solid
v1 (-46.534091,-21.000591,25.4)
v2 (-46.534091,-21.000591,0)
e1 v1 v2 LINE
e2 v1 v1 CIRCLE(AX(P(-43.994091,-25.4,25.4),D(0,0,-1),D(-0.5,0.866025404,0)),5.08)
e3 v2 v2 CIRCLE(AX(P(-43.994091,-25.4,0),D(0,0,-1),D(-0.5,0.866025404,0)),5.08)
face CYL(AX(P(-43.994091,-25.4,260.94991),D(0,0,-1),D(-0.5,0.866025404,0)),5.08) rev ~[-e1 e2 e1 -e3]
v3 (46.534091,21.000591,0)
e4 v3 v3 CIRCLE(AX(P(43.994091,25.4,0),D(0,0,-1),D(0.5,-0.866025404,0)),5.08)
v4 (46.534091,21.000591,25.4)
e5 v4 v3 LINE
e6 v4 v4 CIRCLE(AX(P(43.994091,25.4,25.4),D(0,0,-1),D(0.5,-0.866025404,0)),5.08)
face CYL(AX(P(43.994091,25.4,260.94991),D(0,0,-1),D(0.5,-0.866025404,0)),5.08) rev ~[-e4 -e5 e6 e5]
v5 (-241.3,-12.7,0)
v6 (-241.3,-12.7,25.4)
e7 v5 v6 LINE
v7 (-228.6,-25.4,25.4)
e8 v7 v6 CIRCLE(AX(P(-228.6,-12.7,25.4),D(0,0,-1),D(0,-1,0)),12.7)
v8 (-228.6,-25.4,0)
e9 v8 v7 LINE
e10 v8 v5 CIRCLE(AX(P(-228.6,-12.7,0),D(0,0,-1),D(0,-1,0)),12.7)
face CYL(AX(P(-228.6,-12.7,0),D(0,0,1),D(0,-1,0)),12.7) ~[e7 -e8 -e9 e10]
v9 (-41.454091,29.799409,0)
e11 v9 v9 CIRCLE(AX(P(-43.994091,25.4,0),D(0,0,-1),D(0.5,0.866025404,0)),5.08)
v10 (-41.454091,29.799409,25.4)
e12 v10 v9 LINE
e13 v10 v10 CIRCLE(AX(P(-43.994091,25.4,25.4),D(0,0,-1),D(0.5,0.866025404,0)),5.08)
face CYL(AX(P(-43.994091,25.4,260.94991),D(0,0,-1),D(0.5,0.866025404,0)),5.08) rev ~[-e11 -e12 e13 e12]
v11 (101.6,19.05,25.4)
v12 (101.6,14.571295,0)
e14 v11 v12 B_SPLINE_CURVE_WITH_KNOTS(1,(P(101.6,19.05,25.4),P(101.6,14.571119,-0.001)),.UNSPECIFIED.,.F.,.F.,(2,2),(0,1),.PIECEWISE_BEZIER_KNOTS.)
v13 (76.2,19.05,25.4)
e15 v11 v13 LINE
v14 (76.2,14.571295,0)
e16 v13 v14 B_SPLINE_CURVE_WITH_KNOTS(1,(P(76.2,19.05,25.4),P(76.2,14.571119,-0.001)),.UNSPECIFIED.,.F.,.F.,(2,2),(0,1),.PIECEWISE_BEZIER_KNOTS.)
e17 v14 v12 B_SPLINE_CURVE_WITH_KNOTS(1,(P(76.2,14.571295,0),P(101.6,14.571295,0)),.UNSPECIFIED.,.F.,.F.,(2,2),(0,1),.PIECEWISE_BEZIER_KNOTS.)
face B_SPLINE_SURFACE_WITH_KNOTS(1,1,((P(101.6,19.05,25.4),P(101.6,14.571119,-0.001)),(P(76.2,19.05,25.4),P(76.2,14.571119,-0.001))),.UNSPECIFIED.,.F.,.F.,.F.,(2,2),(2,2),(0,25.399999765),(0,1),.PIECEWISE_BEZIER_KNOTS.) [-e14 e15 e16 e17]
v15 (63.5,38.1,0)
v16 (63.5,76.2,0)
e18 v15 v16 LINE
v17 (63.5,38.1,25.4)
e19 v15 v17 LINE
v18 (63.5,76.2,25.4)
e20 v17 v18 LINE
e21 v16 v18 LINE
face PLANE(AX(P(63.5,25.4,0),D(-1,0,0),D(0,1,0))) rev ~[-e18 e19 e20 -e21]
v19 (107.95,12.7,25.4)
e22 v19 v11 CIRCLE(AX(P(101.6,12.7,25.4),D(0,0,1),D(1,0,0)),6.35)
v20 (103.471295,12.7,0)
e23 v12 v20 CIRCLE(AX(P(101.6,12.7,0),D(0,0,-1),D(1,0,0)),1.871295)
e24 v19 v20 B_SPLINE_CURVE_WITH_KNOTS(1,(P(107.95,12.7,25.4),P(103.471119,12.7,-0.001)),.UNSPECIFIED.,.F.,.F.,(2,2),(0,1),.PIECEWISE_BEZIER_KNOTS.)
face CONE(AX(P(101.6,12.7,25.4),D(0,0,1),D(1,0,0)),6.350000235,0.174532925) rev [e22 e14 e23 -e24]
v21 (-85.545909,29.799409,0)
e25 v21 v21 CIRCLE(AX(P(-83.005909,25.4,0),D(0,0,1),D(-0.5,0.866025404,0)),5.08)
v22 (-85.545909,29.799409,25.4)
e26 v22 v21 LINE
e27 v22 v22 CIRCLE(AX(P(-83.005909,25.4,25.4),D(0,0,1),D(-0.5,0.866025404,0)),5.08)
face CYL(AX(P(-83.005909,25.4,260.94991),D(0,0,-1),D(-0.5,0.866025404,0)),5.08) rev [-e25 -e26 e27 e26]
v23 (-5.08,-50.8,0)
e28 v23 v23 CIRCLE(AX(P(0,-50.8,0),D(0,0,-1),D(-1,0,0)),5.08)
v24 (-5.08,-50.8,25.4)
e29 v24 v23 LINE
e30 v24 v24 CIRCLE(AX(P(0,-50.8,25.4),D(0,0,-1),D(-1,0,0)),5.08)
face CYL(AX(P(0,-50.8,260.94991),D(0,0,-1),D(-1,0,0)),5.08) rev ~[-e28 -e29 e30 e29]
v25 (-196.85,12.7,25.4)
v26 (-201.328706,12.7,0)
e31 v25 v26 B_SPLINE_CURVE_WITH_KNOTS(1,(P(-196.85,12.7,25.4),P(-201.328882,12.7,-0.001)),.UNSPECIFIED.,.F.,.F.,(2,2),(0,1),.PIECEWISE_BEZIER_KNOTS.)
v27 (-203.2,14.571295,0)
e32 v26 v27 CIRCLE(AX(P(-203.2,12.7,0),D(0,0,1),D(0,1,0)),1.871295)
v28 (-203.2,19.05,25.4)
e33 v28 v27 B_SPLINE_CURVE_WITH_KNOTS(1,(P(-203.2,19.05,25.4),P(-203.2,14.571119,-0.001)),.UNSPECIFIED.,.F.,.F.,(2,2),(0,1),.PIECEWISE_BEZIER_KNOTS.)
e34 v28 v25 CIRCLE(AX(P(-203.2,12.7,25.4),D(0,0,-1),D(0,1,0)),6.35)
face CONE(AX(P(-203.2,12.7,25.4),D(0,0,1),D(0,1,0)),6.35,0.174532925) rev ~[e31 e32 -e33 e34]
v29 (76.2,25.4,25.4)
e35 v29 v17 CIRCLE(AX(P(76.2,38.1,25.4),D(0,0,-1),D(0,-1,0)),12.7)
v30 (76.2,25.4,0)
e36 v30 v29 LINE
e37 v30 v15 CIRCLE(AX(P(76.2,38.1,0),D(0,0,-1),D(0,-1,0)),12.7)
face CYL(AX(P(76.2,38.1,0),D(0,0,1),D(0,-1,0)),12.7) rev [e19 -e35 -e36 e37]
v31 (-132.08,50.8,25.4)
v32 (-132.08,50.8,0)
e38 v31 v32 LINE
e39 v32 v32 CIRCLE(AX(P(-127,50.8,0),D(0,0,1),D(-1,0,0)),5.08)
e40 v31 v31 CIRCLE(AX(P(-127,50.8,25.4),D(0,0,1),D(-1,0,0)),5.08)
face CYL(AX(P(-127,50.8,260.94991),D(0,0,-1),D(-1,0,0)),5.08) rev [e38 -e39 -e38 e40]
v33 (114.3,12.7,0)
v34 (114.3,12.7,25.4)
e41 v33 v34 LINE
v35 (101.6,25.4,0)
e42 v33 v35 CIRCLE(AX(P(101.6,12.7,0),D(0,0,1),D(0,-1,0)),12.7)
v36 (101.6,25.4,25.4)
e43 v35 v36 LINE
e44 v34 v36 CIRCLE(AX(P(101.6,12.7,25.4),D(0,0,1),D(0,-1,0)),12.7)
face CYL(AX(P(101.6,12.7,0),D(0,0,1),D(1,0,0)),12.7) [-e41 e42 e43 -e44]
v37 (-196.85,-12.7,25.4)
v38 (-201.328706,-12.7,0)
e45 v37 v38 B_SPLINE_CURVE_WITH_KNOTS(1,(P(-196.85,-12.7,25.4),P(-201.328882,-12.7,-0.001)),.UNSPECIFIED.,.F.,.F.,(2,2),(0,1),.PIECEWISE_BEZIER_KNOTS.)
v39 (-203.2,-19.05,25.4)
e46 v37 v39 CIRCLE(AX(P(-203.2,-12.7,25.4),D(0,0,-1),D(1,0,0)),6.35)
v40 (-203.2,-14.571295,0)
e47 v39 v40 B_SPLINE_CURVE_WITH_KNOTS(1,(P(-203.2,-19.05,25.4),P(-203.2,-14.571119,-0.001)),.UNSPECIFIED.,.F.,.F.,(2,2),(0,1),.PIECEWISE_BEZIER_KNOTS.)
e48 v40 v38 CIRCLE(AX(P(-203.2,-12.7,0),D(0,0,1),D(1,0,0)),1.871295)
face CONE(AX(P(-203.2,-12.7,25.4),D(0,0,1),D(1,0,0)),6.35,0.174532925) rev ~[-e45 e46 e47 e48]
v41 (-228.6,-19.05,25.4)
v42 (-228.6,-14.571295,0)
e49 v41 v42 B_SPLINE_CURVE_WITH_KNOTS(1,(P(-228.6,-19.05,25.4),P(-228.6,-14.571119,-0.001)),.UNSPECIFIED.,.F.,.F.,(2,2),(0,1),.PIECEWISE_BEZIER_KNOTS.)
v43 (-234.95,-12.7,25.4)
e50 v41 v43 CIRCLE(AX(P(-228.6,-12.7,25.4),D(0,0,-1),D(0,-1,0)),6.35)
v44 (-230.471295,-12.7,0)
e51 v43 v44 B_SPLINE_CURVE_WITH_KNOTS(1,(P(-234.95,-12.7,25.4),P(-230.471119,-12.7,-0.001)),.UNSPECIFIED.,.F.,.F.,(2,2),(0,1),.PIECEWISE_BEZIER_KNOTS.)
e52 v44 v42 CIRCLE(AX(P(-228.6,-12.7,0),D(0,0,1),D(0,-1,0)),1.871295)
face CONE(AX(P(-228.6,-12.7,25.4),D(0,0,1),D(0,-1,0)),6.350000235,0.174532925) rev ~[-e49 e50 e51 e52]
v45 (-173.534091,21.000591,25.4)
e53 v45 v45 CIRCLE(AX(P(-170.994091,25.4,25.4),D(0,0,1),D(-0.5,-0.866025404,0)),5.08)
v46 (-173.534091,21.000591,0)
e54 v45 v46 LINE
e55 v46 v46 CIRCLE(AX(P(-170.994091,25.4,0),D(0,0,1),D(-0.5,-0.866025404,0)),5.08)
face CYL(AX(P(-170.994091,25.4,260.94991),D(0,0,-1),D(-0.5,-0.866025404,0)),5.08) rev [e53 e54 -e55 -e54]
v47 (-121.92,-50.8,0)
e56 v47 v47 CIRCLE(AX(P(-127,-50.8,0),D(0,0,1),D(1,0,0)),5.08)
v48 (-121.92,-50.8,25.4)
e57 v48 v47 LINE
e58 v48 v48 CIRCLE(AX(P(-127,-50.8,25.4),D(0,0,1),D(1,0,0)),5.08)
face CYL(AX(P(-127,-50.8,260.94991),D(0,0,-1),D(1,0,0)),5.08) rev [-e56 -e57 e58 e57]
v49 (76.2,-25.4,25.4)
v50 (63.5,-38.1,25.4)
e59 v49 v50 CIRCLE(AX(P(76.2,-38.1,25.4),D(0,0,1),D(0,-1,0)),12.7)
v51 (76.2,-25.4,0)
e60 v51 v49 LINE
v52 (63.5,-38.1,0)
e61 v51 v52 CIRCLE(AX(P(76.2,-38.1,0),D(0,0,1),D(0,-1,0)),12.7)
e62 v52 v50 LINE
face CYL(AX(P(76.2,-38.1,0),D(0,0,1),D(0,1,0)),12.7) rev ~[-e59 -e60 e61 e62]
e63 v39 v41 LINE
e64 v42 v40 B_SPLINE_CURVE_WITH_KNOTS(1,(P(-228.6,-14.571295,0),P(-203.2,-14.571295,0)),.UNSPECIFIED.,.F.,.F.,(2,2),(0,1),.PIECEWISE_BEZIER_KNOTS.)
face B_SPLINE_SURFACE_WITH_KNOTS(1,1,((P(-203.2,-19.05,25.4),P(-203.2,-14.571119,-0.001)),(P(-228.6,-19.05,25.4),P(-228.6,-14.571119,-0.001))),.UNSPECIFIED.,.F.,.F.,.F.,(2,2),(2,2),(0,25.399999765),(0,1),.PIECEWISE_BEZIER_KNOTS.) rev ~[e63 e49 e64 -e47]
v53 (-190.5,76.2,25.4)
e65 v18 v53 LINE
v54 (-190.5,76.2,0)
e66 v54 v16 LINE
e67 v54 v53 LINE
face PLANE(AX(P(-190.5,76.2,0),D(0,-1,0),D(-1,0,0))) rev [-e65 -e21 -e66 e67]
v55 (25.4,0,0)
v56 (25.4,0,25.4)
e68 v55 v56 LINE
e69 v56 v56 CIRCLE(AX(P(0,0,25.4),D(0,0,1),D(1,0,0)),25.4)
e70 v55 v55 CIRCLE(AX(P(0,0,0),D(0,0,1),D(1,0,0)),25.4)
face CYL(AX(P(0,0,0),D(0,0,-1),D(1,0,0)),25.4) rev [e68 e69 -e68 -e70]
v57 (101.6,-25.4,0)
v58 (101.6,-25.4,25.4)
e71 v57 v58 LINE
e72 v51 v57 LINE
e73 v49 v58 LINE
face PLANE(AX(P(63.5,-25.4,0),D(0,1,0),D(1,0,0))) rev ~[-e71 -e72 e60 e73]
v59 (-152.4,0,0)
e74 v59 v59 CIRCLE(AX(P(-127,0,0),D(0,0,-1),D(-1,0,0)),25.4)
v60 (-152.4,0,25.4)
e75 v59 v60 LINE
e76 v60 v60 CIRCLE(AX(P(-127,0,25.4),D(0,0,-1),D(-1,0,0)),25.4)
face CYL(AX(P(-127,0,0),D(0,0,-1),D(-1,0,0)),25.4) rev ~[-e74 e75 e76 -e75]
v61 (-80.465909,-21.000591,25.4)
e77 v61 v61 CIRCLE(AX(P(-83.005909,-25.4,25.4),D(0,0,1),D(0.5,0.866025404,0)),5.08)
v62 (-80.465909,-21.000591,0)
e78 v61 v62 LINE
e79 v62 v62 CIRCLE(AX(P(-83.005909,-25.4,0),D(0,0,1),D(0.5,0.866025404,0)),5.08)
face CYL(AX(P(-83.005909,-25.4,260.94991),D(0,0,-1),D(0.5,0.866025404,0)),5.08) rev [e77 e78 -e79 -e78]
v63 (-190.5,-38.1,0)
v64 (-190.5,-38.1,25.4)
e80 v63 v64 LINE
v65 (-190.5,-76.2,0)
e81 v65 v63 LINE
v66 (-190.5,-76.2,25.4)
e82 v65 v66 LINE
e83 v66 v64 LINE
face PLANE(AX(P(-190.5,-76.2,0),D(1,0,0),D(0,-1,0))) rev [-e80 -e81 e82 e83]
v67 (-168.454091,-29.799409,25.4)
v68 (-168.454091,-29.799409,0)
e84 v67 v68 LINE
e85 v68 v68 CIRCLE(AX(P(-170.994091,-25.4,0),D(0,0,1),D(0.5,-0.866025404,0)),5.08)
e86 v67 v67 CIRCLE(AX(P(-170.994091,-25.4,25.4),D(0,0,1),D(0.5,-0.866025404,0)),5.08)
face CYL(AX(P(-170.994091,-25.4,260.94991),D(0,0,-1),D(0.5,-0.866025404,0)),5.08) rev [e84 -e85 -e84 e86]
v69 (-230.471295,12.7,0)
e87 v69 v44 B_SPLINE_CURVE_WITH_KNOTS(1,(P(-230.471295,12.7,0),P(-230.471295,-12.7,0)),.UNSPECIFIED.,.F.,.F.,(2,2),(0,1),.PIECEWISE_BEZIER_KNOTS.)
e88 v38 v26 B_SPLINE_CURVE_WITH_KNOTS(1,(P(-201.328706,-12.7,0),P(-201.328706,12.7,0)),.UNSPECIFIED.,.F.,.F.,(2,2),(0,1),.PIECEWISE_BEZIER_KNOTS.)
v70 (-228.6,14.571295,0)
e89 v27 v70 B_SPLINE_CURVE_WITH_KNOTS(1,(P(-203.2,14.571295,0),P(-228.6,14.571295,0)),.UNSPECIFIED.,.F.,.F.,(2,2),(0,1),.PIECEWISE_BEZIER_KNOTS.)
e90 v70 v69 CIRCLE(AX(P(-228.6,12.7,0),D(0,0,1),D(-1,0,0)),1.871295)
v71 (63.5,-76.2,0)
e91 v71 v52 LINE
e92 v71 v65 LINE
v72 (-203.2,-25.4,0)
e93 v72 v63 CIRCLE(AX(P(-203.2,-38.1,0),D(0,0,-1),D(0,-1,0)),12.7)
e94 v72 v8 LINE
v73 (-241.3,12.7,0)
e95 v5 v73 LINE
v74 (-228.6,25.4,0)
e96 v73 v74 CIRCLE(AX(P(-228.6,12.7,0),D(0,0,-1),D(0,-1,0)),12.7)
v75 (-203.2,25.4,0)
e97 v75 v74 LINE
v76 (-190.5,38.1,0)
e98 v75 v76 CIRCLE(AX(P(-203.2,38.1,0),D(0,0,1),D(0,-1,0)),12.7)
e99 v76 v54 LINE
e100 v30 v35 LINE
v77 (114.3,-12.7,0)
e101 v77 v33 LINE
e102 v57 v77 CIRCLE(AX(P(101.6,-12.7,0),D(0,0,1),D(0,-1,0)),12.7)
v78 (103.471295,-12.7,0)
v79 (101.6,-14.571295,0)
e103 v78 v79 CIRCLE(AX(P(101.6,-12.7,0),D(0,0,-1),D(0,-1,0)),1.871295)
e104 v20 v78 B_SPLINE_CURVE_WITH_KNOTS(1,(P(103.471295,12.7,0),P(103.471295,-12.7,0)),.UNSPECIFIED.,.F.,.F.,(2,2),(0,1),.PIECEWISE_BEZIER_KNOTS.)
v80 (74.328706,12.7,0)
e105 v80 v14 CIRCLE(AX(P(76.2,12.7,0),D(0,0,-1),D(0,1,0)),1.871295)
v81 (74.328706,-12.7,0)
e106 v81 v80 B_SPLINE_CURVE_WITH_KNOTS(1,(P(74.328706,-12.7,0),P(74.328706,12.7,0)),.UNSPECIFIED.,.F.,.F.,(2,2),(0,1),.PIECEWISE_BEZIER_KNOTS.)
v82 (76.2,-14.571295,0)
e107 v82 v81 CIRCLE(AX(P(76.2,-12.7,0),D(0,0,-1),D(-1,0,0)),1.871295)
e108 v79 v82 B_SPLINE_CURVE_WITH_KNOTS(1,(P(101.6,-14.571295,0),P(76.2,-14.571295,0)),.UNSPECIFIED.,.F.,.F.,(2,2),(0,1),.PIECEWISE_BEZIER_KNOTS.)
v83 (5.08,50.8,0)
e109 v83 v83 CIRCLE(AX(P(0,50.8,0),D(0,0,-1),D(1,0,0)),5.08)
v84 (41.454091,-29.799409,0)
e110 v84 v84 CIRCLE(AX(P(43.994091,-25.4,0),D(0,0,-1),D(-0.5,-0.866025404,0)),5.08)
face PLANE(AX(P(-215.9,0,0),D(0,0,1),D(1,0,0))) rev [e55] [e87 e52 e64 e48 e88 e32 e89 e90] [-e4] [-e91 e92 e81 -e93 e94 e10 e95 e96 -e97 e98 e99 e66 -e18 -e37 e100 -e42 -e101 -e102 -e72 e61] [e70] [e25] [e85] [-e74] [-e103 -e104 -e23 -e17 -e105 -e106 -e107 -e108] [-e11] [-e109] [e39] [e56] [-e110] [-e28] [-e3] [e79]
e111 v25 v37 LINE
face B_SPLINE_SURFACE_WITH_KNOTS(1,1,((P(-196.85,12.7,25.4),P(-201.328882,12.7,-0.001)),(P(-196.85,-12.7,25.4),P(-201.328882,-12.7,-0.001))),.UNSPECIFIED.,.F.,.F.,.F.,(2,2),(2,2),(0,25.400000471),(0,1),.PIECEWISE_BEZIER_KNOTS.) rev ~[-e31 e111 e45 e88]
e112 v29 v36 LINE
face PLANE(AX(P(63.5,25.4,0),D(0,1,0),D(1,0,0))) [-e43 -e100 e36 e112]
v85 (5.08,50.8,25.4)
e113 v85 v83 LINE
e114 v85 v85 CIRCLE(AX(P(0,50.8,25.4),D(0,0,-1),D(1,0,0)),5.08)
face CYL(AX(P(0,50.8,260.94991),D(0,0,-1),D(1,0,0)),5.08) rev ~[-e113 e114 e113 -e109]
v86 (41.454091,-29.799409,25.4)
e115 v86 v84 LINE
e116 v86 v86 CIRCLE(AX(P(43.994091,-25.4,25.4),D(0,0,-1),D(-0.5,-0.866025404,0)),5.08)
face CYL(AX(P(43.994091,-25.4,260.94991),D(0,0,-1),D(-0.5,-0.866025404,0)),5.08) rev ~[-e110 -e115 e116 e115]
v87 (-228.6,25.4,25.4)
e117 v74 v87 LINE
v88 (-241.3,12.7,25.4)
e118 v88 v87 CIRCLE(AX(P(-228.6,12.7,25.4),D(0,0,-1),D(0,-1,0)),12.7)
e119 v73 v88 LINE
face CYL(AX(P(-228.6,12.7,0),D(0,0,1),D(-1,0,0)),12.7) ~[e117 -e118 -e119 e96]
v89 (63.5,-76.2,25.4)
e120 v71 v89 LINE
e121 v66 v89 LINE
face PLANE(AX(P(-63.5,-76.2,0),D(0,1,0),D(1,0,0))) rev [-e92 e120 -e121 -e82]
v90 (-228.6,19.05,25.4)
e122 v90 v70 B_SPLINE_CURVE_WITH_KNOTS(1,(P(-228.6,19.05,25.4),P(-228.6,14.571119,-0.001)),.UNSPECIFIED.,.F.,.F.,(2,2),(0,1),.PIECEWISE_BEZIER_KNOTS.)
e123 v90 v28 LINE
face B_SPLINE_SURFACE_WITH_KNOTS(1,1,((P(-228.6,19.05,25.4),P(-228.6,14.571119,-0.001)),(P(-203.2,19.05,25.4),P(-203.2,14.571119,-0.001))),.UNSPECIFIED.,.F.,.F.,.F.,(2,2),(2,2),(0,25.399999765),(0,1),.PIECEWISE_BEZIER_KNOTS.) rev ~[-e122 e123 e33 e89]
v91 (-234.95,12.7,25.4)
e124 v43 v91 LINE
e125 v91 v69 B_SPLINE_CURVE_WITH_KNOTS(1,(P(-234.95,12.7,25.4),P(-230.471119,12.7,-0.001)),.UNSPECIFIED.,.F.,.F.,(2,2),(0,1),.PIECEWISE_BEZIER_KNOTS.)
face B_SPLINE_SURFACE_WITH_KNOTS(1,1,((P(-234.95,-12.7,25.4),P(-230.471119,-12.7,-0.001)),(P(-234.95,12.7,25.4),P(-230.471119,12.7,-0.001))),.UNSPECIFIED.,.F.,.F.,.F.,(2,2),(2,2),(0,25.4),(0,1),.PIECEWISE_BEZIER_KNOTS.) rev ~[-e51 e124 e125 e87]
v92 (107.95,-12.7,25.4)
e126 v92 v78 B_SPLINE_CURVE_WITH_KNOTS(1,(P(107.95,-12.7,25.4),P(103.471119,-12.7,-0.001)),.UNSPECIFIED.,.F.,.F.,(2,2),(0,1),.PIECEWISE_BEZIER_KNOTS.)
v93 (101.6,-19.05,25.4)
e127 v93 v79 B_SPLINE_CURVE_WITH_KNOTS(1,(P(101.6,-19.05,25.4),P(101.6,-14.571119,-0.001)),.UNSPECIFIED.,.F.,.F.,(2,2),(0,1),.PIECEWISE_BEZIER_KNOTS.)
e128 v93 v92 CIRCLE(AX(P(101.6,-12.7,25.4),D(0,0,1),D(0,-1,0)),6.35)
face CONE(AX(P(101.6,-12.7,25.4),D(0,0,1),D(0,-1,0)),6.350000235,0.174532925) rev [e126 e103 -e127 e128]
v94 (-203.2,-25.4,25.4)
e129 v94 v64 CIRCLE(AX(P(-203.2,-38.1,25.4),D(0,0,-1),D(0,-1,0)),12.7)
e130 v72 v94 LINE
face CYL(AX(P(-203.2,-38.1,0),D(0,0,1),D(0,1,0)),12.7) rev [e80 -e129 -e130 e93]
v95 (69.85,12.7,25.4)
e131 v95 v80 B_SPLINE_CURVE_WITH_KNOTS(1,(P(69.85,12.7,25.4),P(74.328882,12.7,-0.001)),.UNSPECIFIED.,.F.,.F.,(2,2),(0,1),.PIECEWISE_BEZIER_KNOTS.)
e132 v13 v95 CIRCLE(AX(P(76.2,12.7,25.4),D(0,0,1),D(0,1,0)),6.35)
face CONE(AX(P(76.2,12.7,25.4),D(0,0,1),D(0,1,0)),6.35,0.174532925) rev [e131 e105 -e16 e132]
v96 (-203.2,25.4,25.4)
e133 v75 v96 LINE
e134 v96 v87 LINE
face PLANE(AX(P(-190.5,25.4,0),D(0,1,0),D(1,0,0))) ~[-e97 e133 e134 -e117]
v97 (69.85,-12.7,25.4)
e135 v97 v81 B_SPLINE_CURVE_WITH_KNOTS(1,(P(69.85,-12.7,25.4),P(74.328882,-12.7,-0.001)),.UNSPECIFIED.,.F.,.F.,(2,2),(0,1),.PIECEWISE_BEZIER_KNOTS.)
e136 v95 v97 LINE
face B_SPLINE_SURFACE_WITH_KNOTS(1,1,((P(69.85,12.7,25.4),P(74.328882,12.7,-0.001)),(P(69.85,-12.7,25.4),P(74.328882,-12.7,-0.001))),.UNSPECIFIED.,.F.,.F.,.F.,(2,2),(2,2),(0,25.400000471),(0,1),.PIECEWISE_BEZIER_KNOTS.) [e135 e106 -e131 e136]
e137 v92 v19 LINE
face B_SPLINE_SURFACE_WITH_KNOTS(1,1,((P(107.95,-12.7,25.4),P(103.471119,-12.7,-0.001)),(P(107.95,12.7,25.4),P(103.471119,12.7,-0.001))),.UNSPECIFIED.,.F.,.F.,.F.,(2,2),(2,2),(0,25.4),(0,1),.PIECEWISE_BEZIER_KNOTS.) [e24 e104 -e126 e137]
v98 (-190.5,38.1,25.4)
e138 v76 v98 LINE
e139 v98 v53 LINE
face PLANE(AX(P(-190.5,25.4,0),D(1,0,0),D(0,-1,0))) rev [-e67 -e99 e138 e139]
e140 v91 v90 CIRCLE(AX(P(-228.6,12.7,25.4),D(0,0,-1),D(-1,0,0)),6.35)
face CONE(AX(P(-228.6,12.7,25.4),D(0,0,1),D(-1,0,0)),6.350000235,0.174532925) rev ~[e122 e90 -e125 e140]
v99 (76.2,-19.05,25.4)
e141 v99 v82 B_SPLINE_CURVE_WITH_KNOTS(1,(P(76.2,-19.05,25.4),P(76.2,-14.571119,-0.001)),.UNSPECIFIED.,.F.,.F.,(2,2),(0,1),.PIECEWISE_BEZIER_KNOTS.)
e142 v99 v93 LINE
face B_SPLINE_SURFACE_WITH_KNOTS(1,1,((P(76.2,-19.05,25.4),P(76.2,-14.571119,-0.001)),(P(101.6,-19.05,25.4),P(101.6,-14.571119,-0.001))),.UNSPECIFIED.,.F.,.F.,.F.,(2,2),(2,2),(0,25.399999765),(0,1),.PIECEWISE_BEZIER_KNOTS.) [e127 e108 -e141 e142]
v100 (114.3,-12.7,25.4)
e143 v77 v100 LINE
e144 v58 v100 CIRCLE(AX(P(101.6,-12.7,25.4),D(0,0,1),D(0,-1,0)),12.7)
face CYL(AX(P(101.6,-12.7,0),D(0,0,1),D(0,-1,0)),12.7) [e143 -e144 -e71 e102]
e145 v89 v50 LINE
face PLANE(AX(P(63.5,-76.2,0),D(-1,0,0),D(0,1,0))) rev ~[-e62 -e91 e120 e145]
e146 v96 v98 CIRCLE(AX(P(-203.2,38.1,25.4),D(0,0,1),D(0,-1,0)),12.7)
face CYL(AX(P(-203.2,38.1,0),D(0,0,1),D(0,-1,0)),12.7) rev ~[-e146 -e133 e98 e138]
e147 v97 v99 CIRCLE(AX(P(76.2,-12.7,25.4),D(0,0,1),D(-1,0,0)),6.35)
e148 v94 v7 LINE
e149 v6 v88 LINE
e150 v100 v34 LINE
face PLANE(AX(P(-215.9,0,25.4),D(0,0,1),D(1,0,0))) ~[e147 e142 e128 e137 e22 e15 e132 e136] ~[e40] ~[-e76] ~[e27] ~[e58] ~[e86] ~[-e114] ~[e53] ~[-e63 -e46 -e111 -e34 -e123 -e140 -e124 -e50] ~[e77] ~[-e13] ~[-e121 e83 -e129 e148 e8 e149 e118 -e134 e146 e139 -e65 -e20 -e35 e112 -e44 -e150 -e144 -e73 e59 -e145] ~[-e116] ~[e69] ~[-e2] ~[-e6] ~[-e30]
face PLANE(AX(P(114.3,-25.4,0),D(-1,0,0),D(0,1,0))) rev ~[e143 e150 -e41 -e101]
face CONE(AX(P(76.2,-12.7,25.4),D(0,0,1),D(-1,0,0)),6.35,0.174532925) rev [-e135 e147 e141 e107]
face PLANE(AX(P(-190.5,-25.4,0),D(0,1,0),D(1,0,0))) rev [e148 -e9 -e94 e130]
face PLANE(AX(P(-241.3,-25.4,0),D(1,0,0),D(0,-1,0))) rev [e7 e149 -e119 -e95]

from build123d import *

# Parameters (mm, degrees)
F0_W            = 50.8
F0_H            = 50.8
F0_R            = 25.4
F1_DEPTH        = 25.4
F2_R            = 12.7
F4_D            = 10.16
F4_COPIES_COUNT = 6
F5_DEPTH        = 25.401
F5_TAPER        = 10


# Not quite as in the source:
# - a pattern or mirror of a feature is missing from the dataset's text; its kind, count and spacing are read off the source's solid


with BuildPart() as f1:
    # F0 (on Top) → F1 (new body)
    with BuildSketch(Plane.XY):
        with Locations((88.9, 0)):
            Rectangle(F0_W, F0_H)
        Polygon((63.5, 25.4), (63.5, 76.2), (-63.5, 76.2), (-63.5, -76.2), (63.5, -76.2), (63.5, -25.4), align=None)
        Circle(F0_R, mode=Mode.SUBTRACT)
    extrude(amount=F1_DEPTH)

    # F2
    f2_edges = [f1.edges().sort_by_distance(p)[0] for p in [
        (63.5, -25.4, 12.7),
        (63.5, 25.4, 12.7),
        (114.3, -25.4, 12.7),
        (114.3, 25.4, 12.7),
    ]]
    fillet(f2_edges, radius=F2_R)

    # F4 (through all)
    with Locations(Plane.XY.offset(25.4)):
        with Locations((0, -50.8)):
            f4 = Hole(F4_D / 2)

    # F4_copies: F4 ×6 about axis
    f4_copies_axis = Axis((0, 0, 0), (0, 0, 1))
    for i in range(1, F4_COPIES_COUNT):
        add(f4.rotate(f4_copies_axis, i * 360 / F4_COPIES_COUNT), mode=Mode.SUBTRACT)

    # F3 (on face) → F5 (cut, through all)
    with BuildSketch(Plane.XY.offset(25.4)):
        with BuildLine():
            ThreePointArc((107.9500002354, 12.7), (106.090128227, 17.190128227), (101.6, 19.0500002354))
            Line((101.6, 19.0500002354), (76.2000002354, 19.0500002354))
            ThreePointArc((76.2000002354, 19.0500002354), (71.7098721749, 17.190128296), (69.8500002354, 12.7000002354))
            Line((69.8500002354, 12.7000002354), (69.8500002354, -12.7000002354))
            ThreePointArc((69.8500002354, -12.7000002354), (71.7098721749, -17.190128296), (76.2000002354, -19.0500002354))
            Line((76.2000002354, -19.0500002354), (101.6, -19.0500002354))
            ThreePointArc((101.6, -19.0500002354), (106.090128227, -17.190128227), (107.9500002354, -12.7))
            Line((107.9500002354, -12.7), (107.9500002354, 12.7))
        make_face()
    extrude(amount=-F5_DEPTH, taper=F5_TAPER, mode=Mode.SUBTRACT)

    # F6: F1 across face


with BuildPart() as f1_1:
    add(f1.part)
    add(f1.part.mirror(Plane(origin=(-63.5, 0, 12.7), x_dir=(0, -1, 0), z_dir=(-1, 0, 0))))


solid = f1_1.part
